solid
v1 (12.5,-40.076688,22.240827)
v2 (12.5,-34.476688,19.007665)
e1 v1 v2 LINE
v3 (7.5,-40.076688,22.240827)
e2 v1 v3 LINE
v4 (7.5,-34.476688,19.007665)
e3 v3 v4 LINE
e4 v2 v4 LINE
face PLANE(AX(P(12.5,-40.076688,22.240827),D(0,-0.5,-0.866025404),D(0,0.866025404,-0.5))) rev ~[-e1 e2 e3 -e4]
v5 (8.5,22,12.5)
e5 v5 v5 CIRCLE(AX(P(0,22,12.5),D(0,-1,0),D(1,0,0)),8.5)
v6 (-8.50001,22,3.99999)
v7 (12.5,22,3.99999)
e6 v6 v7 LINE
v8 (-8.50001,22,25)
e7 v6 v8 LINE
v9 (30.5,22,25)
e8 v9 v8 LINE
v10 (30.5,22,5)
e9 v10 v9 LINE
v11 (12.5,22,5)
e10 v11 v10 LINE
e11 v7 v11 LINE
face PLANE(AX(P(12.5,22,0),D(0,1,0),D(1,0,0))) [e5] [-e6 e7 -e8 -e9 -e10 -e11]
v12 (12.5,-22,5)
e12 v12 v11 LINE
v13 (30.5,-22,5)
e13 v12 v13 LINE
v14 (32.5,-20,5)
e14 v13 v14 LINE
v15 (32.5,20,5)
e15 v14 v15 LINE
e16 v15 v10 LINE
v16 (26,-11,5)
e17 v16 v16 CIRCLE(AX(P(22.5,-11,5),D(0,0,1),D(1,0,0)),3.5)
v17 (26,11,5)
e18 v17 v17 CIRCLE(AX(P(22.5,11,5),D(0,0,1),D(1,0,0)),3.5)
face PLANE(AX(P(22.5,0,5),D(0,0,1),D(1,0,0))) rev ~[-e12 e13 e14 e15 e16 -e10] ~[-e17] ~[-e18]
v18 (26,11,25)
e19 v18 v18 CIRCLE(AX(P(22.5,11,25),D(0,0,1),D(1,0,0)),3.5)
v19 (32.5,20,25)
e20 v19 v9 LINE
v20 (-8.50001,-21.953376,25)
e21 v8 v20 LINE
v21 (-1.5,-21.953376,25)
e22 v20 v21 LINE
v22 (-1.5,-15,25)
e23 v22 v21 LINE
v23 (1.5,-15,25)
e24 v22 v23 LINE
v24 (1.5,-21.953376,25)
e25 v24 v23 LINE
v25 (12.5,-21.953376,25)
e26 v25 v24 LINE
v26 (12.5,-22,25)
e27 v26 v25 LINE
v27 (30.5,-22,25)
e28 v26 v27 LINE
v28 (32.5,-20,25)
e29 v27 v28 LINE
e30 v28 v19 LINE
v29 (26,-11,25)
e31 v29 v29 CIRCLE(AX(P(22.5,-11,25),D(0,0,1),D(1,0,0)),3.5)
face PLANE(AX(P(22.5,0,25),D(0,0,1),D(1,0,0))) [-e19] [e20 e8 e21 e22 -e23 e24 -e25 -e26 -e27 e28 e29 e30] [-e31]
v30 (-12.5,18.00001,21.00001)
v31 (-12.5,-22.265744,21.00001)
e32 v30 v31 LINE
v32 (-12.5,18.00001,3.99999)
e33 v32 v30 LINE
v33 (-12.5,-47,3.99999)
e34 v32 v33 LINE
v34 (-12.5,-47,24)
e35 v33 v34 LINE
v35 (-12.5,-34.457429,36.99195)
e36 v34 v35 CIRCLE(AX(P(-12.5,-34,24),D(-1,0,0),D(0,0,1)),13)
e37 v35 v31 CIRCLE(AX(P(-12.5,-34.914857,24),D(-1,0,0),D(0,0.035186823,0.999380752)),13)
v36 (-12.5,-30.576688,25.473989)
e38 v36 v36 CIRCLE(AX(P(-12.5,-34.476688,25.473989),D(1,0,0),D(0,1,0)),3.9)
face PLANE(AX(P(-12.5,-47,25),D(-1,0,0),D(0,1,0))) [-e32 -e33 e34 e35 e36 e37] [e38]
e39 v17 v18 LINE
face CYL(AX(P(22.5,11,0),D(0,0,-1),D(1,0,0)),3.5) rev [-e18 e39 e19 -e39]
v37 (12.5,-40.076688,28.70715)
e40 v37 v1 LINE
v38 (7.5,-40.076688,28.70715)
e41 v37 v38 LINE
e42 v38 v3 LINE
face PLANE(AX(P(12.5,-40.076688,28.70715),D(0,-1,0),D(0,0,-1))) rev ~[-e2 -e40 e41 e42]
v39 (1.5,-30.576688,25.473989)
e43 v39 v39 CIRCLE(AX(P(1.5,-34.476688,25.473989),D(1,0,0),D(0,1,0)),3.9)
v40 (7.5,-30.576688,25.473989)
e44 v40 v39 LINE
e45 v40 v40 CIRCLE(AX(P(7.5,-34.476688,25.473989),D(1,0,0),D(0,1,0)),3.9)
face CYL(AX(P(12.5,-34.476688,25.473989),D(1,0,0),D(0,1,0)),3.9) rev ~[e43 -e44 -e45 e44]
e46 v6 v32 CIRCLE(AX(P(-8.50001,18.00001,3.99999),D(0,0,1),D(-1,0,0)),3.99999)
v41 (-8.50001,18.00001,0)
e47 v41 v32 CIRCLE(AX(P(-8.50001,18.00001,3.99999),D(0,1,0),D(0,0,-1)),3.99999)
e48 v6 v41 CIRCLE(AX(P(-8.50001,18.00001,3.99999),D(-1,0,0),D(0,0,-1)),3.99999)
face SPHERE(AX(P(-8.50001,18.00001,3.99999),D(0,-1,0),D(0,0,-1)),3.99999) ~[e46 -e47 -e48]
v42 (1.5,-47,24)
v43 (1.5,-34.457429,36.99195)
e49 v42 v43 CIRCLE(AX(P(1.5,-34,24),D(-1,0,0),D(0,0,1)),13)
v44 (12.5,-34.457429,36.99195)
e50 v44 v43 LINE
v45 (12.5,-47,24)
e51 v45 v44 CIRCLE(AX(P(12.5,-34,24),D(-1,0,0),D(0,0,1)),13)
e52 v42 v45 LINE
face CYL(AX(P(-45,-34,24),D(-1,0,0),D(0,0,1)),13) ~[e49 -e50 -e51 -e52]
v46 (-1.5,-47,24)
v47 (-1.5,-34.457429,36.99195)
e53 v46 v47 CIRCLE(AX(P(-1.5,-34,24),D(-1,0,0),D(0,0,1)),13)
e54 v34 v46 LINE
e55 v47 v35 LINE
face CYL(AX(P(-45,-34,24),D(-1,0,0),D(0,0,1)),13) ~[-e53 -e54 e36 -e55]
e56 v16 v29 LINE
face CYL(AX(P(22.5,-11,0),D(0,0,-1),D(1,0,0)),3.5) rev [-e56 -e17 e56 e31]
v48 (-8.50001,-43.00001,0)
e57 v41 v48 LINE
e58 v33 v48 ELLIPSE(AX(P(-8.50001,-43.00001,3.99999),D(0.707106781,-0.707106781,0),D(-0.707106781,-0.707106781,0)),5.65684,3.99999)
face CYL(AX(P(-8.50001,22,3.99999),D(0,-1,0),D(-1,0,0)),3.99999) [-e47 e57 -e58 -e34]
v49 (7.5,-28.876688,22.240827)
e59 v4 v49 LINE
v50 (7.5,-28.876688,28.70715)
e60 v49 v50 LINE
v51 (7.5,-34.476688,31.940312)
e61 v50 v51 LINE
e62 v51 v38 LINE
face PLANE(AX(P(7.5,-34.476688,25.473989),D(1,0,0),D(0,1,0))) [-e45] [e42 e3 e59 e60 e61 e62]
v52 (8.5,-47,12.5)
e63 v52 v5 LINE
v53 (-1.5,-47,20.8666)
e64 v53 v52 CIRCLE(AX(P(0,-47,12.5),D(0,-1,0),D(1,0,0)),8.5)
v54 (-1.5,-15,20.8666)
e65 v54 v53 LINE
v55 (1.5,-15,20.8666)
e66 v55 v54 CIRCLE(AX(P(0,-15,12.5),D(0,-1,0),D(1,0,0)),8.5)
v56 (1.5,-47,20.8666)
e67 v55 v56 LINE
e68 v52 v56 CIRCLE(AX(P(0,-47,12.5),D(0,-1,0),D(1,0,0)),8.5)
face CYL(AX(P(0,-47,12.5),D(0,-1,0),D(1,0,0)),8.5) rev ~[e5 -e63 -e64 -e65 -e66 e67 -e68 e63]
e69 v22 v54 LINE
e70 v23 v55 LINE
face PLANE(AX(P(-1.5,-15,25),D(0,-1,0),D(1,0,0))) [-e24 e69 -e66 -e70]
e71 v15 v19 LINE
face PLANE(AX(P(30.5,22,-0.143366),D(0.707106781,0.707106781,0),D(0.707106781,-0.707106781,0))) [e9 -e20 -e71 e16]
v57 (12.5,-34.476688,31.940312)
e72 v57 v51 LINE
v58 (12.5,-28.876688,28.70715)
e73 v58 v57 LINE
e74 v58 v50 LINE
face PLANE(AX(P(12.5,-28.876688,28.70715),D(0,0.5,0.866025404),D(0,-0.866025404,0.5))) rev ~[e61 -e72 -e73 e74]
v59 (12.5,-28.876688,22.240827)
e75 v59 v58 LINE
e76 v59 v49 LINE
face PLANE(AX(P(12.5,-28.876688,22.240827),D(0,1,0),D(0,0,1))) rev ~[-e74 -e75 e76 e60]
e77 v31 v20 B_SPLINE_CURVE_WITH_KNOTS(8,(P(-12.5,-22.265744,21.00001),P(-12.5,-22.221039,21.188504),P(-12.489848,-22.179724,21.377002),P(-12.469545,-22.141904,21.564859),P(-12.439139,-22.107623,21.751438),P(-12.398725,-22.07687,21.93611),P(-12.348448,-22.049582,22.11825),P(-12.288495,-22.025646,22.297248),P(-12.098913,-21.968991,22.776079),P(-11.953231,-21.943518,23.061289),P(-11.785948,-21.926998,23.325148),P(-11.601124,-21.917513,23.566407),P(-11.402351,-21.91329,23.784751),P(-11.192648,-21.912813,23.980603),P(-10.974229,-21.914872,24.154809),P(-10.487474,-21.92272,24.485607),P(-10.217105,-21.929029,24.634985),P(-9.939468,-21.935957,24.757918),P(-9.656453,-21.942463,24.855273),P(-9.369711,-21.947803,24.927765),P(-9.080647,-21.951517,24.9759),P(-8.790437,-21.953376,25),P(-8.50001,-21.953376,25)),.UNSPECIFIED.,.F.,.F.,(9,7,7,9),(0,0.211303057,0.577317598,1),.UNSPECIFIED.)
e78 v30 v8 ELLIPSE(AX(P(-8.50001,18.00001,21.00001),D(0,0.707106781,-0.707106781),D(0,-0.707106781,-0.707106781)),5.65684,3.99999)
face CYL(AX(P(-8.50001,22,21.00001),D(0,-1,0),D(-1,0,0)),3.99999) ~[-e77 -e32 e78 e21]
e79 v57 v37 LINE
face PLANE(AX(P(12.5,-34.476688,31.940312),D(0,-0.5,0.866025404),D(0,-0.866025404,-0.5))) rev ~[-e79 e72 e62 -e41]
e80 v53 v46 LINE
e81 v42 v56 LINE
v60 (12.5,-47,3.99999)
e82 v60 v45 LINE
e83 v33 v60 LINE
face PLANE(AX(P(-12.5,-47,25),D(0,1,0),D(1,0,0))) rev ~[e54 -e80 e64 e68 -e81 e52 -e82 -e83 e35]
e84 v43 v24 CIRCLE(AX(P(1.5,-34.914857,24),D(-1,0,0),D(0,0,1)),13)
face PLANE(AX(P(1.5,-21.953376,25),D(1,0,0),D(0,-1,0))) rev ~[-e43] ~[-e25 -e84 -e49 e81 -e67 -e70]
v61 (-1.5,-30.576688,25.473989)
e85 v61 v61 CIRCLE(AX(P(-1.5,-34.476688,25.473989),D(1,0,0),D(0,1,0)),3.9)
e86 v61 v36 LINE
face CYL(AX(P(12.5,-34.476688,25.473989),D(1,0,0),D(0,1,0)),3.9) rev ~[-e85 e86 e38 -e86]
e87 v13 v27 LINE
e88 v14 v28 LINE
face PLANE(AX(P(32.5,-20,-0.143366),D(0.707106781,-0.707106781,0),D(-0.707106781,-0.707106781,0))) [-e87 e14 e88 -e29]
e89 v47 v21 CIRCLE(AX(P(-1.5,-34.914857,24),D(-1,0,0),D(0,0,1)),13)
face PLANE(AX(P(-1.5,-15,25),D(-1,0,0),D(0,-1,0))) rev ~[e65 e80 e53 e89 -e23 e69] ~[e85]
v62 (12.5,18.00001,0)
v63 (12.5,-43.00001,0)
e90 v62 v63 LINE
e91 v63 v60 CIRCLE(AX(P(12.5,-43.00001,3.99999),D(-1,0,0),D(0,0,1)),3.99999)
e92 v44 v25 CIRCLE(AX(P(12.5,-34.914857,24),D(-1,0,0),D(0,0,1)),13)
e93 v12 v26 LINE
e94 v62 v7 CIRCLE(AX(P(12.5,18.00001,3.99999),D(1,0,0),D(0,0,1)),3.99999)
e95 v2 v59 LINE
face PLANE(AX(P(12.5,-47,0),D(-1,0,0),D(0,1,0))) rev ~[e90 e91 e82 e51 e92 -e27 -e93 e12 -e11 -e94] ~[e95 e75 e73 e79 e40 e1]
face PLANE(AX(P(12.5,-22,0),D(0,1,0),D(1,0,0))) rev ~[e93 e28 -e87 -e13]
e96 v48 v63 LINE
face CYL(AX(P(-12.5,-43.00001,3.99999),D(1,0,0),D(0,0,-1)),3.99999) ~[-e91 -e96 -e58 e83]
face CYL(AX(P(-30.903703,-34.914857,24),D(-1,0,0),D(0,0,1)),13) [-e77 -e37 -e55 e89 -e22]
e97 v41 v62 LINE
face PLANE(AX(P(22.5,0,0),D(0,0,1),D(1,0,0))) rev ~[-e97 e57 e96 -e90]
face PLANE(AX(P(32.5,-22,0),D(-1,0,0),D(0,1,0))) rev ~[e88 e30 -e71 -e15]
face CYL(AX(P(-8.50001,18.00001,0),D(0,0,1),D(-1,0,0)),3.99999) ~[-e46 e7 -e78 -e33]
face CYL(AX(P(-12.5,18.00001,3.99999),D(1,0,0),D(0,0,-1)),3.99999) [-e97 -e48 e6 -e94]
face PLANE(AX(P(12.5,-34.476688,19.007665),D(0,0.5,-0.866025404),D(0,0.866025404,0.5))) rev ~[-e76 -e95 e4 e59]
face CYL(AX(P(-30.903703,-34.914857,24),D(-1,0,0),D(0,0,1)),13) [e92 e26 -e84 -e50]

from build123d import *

# Parameters (mm, degrees)
F0_W         = 25
F0_H         = 44
F0_H_2       = 25
F1_DEPTH     = 25
F0_W_2       = 20
F0_R         = 3.5
F2_DEPTH     = 25
F3_R         = 8.5
F4_DEPTH     = 69.001
F5_W         = 11
F5_H         = 25.0466239899
F6_DEPTH     = 12
F5_W_2       = 3
F5_H_2       = 6.9533760101
F7_DEPTH     = 4.1343997347
F9_T1_DEPTH  = 76
F9_T3_DEPTH  = 76
F9_T5_DEPTH  = 75.8074069841
F9_T7_DEPTH  = 75.8074069841
F10_DEPTH    = 5
F8_R         = 3.9
F11_DEPTH    = 25.001
F12_DEPTH    = 25.001
F13_DEPTH    = 5
F14_R        = 3.99999
F15_T1_DEPTH = 30.2867319519


# Not quite as in the source:
# - a fillet or chamfer that OpenCascade refuses, or shapes differently, is made with other operations: its cross-section is extruded or revolved along the edge and cut away or added
# - a fillet or chamfer is up to 0.001 mm smaller than in the source, because OpenCascade refuses the exact size
# - a feature names something its author has since deleted; it is built from what else it names


with BuildPart() as f1:
    # F0 (on Top) → F1 (new body)
    with BuildSketch(Plane.XY):
        Rectangle(F0_W, F0_H)
        with Locations((0, -34.5)):
            Rectangle(F0_W, F0_H_2)
    extrude(amount=F1_DEPTH)

    # F0 (on Top) → F2 (join)
    with BuildSketch(Plane.XY):
        with Locations((22.5, 0)):
            Rectangle(F0_W_2, F0_H)
        with Locations((22.5, -11)):
            Circle(F0_R, mode=Mode.SUBTRACT)
        with Locations((22.5, 11)):
            Circle(F0_R, mode=Mode.SUBTRACT)
    extrude(amount=F2_DEPTH)

    # F3 (on face) → F4 (cut, through all)
    with BuildSketch(Plane.XZ.offset(47)):
        with Locations((0, 12.5)):
            Circle(F3_R)
    extrude(amount=-F4_DEPTH, mode=Mode.SUBTRACT)

    # F5 (on face) → F6 (join)
    with BuildSketch(Plane.XY.offset(25)):
        with Locations((-7, -34.476688005)):
            Rectangle(F5_W, F5_H)
        Polygon((12.5, -22), (12.5, -21.9533760101), (1.5, -21.9533760101), (1.5, -47), (12.5, -47), align=None)
    extrude(amount=F6_DEPTH)

    # F5 (on face) → F7 (cut, through all)
    with BuildSketch(Plane.XY.offset(25)):
        with Locations((0, -34.476688005)):
            Rectangle(F5_W_2, F5_H)
        with Locations((0, -18.476688005)):
            Rectangle(F5_W_2, F5_H_2)
    extrude(amount=-F7_DEPTH, mode=Mode.SUBTRACT)

    # F9: fillet of radius 13 on 4 edges, made by hand

    # F9_s2 → F9_t1 (cut)
    with BuildSketch(Plane.YZ.offset(-45)):
        with BuildLine():
            ThreePointArc((-34, 37), (-43.1923881554, 33.1923881554), (-47, 24))
            Line((-47, 24), (-47, 37))
            Line((-47, 37), (-34, 37))
        make_face()
    extrude(amount=F9_T1_DEPTH, mode=Mode.SUBTRACT)

    # F9_s4 → F9_t3 (cut)
    with BuildSketch(Plane.YZ.offset(-31)):
        with BuildLine():
            ThreePointArc((-34, 37), (-43.1923881554, 33.1923881554), (-47, 24))
            Line((-47, 24), (-47, 37))
            Line((-47, 37), (-34, 37))
        make_face()
    extrude(amount=F9_T3_DEPTH, mode=Mode.SUBTRACT)

    # F9_s6 → F9_t5 (cut)
    with BuildSketch(Plane.YZ.offset(-30.903703492)):
        with BuildLine():
            ThreePointArc((-34.9148574069, 37), (-26.0830965405, 33.5393920142), (-21.9533760101, 25))
            Line((-21.9533760101, 25), (-21.9533760101, 37))
            Line((-21.9533760101, 37), (-34.9148574069, 37))
        make_face()
    extrude(amount=F9_T5_DEPTH, mode=Mode.SUBTRACT)

    # F9_s8 → F9_t7 (cut)
    with BuildSketch(Plane.YZ.offset(-44.903703492)):
        with BuildLine():
            ThreePointArc((-21.9533760101, 25), (-26.0830965405, 33.5393920142), (-34.9148574069, 37))
            Line((-34.9148574069, 37), (-21.9533760101, 37))
            Line((-21.9533760101, 37), (-21.9533760101, 25))
        make_face()
    extrude(amount=F9_T7_DEPTH, mode=Mode.SUBTRACT)

    # F0 (on Top) → F10 (cut)
    with BuildSketch(Plane.XY):
        with Locations((22.5, 0)):
            Rectangle(F0_W_2, F0_H)
        with Locations((22.5, -11)):
            Circle(F0_R, mode=Mode.SUBTRACT)
        with Locations((22.5, 11)):
            Circle(F0_R, mode=Mode.SUBTRACT)
    extrude(amount=F10_DEPTH, mode=Mode.SUBTRACT)

    # F8 (on face) → F11 (cut, through all)
    with BuildSketch(Plane.YZ.offset(12.5)):
        with Locations((-34.476688005, 25.4739885092)):
            Circle(F8_R)
    extrude(amount=-F11_DEPTH, mode=Mode.SUBTRACT)

    # F8 (on face) → F12 (cut, through all)
    with BuildSketch(Plane.YZ.offset(12.5)):
        with Locations((-34.476688005, 25.4739885092)):
            Circle(F8_R)
    extrude(amount=-F12_DEPTH, mode=Mode.SUBTRACT)

    # F8 (on face) → F13 (cut)
    with BuildSketch(Plane.YZ.offset(12.5)):
        Polygon((-40.076688005, 28.7071500166), (-40.076688005, 22.2408270017), (-34.476688005, 19.0076654943), (-28.876688005, 22.2408270017), (-28.876688005, 28.7071500166), (-34.476688005, 31.9403115241), align=None)
        with Locations((-34.476688005, 25.4739885092)):
            Circle(F8_R, mode=Mode.SUBTRACT)
    extrude(amount=-F13_DEPTH, mode=Mode.SUBTRACT)

    # F14 (radius 4 in the source; OpenCascade refuses exactly that, so slightly less here)
    f14_edges = [f1.edges().sort_by_distance(p)[0] for p in [
        (-12.5, -12.5, 0),
        (0, -47, 0),
        (-12.5, 0.023312, 25),
        (0, 22, 0),
        (-12.5, 22, 12.5),
    ]]
    fillet(f14_edges, radius=F14_R)

    # F15: chamfer of 2 on 2 edges, made by hand

    # F15_s2 → F15_t1 (cut)
    with BuildSketch(Plane.XY.offset(-0.1433659759)):
        Polygon((30.5, 22), (32.5, 20), (32.5, 22), align=None)
        Polygon((32.5, -20), (30.5, -22), (32.5, -22), align=None)
    extrude(amount=F15_T1_DEPTH, mode=Mode.SUBTRACT)


solid = f1.part
